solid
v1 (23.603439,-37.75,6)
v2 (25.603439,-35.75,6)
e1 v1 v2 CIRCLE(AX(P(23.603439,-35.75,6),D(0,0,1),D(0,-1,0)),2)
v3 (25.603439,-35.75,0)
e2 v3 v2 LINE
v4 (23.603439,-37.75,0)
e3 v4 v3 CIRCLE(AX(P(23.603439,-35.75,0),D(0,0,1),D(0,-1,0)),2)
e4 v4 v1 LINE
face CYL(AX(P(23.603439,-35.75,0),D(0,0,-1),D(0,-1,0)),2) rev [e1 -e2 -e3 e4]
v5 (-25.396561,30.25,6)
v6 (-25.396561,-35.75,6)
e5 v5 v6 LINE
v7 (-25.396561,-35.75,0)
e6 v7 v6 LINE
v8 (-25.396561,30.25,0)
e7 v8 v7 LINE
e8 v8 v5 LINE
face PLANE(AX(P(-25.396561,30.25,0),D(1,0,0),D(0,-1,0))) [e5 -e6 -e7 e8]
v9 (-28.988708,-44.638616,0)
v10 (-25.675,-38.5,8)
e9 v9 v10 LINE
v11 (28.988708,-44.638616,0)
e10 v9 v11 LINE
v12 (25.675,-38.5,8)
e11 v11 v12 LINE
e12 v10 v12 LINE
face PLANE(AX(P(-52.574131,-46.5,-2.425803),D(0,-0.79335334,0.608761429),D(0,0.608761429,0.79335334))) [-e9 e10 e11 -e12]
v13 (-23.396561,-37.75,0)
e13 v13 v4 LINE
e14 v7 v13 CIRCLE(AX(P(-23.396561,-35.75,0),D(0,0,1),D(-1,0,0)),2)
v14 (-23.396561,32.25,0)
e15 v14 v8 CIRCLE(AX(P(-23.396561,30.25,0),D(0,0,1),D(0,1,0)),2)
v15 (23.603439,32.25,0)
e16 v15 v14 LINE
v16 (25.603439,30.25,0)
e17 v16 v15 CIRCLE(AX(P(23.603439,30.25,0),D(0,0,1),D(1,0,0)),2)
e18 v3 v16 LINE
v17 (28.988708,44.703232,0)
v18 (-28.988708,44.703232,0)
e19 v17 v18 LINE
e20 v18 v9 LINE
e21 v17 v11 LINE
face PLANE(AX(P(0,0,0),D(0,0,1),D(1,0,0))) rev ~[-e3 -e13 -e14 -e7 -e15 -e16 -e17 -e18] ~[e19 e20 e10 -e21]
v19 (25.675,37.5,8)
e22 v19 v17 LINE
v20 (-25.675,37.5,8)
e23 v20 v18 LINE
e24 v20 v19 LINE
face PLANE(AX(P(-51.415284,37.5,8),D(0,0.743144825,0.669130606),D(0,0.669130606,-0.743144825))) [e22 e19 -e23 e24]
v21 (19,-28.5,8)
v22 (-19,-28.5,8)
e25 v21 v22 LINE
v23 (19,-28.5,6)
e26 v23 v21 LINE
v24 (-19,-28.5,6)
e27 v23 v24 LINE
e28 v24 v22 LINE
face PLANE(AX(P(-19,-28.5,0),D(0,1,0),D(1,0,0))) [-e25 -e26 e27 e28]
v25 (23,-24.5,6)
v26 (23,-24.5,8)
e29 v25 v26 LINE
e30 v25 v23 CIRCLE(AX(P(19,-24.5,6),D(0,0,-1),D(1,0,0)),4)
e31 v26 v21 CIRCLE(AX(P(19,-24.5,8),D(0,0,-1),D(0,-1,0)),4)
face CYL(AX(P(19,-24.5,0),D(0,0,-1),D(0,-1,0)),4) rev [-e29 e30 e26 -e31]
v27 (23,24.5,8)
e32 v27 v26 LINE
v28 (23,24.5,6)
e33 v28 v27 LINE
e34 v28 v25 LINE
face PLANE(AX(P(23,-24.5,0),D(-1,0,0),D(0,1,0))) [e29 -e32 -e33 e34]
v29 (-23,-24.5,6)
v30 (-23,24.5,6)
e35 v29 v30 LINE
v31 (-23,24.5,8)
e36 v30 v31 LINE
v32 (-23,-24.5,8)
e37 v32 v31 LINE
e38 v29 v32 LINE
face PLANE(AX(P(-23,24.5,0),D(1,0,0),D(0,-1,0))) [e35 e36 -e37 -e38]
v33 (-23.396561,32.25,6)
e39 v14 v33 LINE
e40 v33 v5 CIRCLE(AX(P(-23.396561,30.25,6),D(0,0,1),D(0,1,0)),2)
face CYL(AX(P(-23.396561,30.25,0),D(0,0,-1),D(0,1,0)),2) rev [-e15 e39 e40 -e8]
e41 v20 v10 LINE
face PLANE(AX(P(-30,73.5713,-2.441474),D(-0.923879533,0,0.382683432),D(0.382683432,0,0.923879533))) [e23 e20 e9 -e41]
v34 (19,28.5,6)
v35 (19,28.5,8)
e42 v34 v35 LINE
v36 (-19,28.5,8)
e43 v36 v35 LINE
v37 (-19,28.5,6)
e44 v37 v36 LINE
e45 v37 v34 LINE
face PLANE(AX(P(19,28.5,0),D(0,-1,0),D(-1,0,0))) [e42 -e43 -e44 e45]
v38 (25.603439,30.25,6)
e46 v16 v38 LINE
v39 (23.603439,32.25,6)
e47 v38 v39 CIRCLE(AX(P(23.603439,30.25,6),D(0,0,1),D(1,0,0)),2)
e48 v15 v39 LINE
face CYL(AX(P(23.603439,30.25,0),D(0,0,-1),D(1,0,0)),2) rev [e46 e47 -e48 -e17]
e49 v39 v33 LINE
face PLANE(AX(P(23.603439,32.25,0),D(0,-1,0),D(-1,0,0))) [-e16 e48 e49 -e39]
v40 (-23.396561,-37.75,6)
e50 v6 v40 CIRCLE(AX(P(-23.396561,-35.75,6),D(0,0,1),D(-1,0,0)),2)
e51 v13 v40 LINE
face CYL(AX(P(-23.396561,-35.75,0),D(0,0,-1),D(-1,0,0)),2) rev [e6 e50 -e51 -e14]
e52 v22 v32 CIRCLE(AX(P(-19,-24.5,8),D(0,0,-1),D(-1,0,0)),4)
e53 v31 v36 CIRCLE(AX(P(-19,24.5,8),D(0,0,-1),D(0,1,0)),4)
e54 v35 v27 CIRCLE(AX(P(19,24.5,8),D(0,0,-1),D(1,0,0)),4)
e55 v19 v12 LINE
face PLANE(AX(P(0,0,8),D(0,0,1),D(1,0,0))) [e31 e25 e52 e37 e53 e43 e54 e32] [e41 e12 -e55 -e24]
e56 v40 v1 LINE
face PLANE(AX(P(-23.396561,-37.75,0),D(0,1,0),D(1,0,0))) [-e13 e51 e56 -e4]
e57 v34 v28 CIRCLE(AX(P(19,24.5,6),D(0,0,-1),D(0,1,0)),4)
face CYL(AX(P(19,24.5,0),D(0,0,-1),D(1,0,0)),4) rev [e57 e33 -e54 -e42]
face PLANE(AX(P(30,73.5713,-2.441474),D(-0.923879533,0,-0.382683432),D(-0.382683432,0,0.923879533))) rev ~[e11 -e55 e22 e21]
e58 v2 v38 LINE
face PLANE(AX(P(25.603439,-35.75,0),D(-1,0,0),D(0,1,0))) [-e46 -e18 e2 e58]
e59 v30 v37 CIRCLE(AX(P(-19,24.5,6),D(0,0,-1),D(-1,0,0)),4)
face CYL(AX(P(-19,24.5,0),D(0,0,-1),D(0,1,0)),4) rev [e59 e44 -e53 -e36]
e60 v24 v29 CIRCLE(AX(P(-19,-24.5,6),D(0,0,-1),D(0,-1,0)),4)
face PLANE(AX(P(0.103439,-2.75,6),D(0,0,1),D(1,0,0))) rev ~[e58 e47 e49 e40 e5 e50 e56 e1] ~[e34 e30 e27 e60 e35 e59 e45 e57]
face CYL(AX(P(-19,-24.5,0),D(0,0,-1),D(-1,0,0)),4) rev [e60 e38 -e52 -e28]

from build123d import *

# Parameters (mm, degrees)
F1_W        = 60
F1_H        = 93
F2_DEPTH    = 8
F3_T1_DEPTH = 147.142599219
F4_T1_DEPTH = 102.8305675527
F5_DEPTH    = 25
F6_DEPTH    = 6
F7_T1_DEPTH = 105.1482614058


# Not quite as in the source:
# - a fillet or chamfer that OpenCascade refuses, or shapes differently, is made with other operations: its cross-section is extruded or revolved along the edge and cut away or added


with BuildPart() as f2:
    # F1 (on Top) → F2 (new body)
    with BuildSketch(Plane.XY):
        Rectangle(F1_W, F1_H)
    extrude(amount=F2_DEPTH)

    # F3: chamfer of 4.325 x 10.4414736573 on 2 edges, made by hand

    # F3_s2 → F3_t1 (cut)
    with BuildSketch(Plane.XZ.offset(-73.5712996095)):
        Polygon((30, -2.4414736573), (25.675, 8), (30, 8), align=None)
        Polygon((-30, -2.4414736573), (-25.675, 8), (-30, 8), align=None)
    extrude(amount=F3_T1_DEPTH, mode=Mode.SUBTRACT)

    # F4: chamfer of 9 x 9.9955126335 on 1 edges, made by hand

    # F4_s2 → F4_t1 (cut)
    with BuildSketch(Plane.YZ.offset(-51.4152837764)):
        Polygon((37.5, 8), (46.5, -1.9955126335), (46.5, 8), align=None)
    extrude(amount=F4_T1_DEPTH, mode=Mode.SUBTRACT)

    # F0 (on Top) → F5 (cut)
    with BuildSketch(Plane.XY):
        with BuildLine():
            ThreePointArc((23, 24.5), (21.8284271247, 27.3284271247), (19, 28.5))
            Line((19, 28.5), (-19, 28.5))
            ThreePointArc((-19, 28.5), (-21.8284271247, 27.3284271247), (-23, 24.5))
            Line((-23, 24.5), (-23, -24.5))
            ThreePointArc((-23, -24.5), (-21.8284271247, -27.3284271247), (-19, -28.5))
            Line((-19, -28.5), (19, -28.5))
            ThreePointArc((19, -28.5), (21.8284271247, -27.3284271247), (23, -24.5))
            Line((23, -24.5), (23, 24.5))
        make_face()
    extrude(amount=F5_DEPTH, mode=Mode.SUBTRACT)

    # F0 (on Top) → F6 (cut)
    with BuildSketch(Plane.XY):
        with BuildLine():
            ThreePointArc((25.6034387499, 30.25), (25.0176523123, 31.6642135624), (23.6034387499, 32.25))
            Line((23.6034387499, 32.25), (-23.3965612501, 32.25))
            ThreePointArc((-23.3965612501, 32.25), (-24.8107748125, 31.6642135624), (-25.3965612501, 30.25))
            Line((-25.3965612501, 30.25), (-25.3965612501, -35.75))
            ThreePointArc((-25.3965612501, -35.75), (-24.8107748125, -37.1642135624), (-23.3965612501, -37.75))
            Line((-23.3965612501, -37.75), (23.6034387499, -37.75))
            ThreePointArc((23.6034387499, -37.75), (25.0176523123, -37.1642135624), (25.6034387499, -35.75))
            Line((25.6034387499, -35.75), (25.6034387499, 30.25))
        make_face()
        with BuildLine():
            Line((-19, 28.5), (19, 28.5))
            ThreePointArc((19, 28.5), (21.8284271247, 27.3284271247), (23, 24.5))
            Line((23, 24.5), (23, -24.5))
            ThreePointArc((23, -24.5), (21.8284271247, -27.3284271247), (19, -28.5))
            Line((19, -28.5), (-19, -28.5))
            ThreePointArc((-19, -28.5), (-21.8284271247, -27.3284271247), (-23, -24.5))
            Line((-23, -24.5), (-23, 24.5))
            ThreePointArc((-23, 24.5), (-21.8284271247, 27.3284271247), (-19, 28.5))
        make_face(mode=Mode.SUBTRACT)
    extrude(amount=F6_DEPTH, mode=Mode.SUBTRACT)

    # F7: chamfer of 8 x 10.4258029827 on 1 edges, made by hand

    # F7_s2 → F7_t1 (cut)
    with BuildSketch(Plane.YZ.offset(-52.5741307029)):
        Polygon((-46.5, -2.4258029827), (-38.5, 8), (-46.5, 8), align=None)
    extrude(amount=F7_T1_DEPTH, mode=Mode.SUBTRACT)


solid = f2.part
